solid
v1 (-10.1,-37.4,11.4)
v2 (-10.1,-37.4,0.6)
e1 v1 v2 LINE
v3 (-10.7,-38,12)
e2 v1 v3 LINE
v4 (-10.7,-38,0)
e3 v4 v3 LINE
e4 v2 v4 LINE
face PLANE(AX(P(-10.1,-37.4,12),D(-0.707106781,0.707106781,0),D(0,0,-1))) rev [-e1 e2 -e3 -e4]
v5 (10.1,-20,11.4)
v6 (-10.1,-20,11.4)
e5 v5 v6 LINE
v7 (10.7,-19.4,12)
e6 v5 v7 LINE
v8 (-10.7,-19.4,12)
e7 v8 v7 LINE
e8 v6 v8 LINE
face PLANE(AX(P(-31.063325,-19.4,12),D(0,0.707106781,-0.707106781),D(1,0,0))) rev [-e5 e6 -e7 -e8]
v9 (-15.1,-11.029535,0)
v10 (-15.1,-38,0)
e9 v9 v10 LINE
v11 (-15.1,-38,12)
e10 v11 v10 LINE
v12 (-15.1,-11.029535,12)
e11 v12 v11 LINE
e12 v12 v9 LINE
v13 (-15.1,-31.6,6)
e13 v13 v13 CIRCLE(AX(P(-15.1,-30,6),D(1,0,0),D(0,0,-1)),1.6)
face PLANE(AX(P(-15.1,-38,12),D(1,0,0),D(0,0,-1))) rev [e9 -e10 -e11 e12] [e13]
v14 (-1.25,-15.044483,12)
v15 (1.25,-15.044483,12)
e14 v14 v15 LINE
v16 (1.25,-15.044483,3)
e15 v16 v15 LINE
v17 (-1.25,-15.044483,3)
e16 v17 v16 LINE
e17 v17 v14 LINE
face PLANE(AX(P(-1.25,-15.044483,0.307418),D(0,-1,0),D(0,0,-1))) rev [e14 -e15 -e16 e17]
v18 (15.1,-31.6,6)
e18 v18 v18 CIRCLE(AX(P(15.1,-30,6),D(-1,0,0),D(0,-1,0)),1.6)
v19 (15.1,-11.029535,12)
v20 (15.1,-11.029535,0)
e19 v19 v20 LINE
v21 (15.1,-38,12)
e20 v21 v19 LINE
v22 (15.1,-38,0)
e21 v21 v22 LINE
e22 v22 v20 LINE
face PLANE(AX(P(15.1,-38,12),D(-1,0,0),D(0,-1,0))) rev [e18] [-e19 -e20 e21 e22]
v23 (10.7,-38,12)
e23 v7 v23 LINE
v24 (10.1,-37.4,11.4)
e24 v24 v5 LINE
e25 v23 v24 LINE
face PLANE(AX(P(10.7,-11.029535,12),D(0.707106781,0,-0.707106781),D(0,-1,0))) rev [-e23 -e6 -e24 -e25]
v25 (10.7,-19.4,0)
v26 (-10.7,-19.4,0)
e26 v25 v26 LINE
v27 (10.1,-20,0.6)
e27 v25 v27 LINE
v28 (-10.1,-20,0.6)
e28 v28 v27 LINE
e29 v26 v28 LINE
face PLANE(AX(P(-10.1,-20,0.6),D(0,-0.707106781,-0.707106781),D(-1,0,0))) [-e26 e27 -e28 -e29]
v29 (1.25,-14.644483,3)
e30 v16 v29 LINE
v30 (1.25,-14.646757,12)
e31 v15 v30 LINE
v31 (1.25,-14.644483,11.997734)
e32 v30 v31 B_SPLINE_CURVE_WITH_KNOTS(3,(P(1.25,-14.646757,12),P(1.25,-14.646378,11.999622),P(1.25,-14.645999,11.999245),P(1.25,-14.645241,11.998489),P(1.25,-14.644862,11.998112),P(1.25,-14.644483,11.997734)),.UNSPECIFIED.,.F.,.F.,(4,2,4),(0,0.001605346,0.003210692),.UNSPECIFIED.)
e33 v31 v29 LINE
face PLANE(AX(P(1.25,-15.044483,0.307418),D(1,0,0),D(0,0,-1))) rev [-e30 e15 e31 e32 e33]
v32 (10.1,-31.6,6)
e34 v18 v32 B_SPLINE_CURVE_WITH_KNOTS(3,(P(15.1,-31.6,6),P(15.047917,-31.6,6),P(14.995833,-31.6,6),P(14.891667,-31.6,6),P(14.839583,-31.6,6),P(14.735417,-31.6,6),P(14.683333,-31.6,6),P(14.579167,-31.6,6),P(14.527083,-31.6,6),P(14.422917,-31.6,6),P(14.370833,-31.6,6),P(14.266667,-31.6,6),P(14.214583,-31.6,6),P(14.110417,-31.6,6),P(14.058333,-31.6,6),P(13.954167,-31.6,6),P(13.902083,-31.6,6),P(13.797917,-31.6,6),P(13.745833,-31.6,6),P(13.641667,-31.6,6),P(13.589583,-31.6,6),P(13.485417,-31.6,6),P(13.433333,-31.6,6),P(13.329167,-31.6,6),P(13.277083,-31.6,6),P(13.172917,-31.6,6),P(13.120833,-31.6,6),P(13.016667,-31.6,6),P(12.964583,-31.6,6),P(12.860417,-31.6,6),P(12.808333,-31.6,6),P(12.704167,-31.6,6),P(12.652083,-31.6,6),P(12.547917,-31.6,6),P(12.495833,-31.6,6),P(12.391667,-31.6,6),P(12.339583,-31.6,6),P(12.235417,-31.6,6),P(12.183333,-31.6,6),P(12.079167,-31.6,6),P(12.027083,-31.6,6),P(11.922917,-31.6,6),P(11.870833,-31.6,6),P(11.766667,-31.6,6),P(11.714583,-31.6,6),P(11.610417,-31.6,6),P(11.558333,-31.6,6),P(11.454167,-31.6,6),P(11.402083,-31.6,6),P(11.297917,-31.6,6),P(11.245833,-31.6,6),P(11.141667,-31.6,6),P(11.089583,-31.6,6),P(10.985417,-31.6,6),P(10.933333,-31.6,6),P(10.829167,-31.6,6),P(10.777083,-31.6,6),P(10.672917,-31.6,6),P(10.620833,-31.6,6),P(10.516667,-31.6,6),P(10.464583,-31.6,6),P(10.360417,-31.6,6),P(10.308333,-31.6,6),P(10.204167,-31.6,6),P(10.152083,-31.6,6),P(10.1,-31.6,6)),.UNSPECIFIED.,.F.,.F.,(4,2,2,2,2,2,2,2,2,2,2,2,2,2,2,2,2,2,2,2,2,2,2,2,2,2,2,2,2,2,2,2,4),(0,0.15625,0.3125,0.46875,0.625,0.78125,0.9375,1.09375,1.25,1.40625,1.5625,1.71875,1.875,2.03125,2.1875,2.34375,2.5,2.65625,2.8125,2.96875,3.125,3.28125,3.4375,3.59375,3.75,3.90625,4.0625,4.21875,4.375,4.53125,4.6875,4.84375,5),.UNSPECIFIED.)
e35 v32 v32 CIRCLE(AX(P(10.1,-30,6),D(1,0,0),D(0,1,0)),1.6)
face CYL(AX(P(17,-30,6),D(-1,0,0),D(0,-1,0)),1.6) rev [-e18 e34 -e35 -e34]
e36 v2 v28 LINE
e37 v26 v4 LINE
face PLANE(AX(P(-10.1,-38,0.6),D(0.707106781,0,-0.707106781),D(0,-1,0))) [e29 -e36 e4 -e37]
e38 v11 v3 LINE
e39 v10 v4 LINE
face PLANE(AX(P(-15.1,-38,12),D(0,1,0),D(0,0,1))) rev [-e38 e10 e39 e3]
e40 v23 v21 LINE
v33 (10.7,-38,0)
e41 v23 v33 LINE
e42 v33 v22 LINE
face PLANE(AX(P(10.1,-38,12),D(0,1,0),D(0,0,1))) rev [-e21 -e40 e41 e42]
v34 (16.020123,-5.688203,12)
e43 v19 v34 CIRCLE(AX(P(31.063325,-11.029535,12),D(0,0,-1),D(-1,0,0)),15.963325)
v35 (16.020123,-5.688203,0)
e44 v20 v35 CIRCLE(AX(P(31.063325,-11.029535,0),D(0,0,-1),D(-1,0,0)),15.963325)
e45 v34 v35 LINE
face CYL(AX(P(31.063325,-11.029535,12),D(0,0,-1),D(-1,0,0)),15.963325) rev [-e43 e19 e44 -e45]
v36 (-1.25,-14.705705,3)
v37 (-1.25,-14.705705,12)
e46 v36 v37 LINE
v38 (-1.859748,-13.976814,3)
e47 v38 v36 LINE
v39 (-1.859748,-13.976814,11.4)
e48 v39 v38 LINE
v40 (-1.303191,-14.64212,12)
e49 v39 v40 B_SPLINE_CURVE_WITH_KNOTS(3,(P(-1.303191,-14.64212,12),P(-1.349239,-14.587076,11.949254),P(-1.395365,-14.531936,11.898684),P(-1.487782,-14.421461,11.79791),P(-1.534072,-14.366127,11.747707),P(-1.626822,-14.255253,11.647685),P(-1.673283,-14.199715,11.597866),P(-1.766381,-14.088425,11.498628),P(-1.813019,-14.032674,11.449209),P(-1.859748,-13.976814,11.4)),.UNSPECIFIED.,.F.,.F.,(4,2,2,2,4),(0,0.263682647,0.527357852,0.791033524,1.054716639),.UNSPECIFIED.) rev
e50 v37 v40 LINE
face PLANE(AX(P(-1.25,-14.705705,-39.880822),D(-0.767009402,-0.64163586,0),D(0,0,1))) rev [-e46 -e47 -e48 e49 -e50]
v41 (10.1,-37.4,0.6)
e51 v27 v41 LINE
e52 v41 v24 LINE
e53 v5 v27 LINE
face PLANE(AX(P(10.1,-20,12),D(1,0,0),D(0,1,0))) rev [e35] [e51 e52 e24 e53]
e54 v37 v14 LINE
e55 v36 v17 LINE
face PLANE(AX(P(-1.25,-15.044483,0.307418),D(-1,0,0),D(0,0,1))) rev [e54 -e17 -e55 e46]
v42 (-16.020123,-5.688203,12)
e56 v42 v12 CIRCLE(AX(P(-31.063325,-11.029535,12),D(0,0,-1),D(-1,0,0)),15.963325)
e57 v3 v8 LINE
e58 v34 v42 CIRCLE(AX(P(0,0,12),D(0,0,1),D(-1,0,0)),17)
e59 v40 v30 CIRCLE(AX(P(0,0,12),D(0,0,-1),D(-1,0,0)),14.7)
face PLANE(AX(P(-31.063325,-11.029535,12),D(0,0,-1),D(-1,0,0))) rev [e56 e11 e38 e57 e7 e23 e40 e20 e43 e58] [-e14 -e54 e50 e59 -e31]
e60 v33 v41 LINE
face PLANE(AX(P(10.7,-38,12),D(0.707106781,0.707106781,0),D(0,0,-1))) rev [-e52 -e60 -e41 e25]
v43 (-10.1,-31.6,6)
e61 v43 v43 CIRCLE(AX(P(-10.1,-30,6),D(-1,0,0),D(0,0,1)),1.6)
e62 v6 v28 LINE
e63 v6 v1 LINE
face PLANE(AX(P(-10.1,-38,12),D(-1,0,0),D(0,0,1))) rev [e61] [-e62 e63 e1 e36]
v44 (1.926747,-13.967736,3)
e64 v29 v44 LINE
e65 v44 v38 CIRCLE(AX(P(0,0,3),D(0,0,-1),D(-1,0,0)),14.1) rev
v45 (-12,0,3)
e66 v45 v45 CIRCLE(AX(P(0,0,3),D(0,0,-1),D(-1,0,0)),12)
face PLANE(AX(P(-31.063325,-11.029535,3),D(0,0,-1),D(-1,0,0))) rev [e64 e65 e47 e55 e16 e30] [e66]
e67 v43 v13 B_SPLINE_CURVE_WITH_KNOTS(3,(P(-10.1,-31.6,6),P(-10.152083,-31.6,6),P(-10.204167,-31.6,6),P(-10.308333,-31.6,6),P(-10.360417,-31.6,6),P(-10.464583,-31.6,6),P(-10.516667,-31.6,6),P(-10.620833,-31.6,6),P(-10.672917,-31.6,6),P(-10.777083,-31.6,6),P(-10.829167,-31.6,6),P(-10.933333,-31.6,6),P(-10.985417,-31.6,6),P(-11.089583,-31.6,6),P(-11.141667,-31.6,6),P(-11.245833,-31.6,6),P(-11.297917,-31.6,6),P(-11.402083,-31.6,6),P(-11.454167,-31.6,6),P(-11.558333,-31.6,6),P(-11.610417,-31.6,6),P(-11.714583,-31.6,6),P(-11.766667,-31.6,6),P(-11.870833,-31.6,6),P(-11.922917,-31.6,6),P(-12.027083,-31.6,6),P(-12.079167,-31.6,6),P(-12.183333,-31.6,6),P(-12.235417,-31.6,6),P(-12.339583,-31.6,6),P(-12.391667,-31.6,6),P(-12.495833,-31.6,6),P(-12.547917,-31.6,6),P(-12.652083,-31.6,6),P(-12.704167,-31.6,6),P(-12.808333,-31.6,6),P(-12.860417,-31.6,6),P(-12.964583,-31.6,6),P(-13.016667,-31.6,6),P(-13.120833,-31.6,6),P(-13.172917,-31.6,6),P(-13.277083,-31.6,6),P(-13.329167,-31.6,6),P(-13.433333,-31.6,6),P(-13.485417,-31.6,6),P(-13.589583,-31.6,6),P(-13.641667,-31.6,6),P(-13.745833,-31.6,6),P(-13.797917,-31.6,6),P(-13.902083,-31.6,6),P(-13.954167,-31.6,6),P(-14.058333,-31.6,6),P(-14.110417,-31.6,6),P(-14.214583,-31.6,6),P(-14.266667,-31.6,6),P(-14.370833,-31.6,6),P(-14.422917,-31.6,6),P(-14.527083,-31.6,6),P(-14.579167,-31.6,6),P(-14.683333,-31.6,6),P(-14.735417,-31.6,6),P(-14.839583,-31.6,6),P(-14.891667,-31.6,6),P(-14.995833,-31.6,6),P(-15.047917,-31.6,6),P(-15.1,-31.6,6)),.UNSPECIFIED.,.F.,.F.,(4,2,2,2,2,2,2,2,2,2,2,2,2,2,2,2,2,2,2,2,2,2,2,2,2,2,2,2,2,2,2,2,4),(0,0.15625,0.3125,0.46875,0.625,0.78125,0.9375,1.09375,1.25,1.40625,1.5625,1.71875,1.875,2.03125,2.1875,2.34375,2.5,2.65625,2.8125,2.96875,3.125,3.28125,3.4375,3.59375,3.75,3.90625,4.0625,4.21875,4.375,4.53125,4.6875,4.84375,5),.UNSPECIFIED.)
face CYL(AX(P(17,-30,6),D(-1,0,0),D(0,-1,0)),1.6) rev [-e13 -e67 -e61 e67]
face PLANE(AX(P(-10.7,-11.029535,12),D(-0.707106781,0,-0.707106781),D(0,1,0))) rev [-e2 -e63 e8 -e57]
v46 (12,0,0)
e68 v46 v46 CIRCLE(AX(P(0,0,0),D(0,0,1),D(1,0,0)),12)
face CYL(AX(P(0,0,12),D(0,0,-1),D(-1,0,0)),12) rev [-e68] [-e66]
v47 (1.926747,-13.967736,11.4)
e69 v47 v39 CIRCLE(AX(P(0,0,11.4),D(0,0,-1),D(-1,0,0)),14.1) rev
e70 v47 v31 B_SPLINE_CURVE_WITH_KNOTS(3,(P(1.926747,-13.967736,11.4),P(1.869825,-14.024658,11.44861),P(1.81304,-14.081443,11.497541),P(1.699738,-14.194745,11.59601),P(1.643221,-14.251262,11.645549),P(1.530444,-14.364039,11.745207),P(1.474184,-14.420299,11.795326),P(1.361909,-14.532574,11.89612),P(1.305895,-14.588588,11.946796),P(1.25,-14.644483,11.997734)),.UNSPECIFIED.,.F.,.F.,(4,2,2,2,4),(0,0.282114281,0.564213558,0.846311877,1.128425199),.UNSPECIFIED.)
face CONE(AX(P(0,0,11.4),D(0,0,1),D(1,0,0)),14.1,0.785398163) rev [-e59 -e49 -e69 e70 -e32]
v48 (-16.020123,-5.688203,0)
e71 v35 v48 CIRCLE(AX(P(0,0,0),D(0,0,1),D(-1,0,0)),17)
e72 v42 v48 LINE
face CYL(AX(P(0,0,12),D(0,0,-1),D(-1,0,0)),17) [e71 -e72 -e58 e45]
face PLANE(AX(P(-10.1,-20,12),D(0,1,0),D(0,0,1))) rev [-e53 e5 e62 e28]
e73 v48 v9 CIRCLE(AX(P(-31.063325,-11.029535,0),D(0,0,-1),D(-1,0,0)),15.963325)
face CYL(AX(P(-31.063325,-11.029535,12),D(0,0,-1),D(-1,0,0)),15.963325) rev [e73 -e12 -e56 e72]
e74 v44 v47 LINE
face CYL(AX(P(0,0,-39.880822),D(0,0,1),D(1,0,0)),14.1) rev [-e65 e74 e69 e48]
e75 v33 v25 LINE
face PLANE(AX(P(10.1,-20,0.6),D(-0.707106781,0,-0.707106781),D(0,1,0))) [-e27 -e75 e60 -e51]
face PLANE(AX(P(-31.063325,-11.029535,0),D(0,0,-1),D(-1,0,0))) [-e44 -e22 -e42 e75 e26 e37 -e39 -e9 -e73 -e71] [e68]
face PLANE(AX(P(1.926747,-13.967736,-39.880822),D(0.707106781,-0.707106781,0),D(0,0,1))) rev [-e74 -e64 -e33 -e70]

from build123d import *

# Parameters (mm, degrees)
SKETCH1_R               = 12
BOSS_EXTRUDE1_DEPTH     = 12
SKETCH9_R               = 14.1
CUT_EXTRUDE2_DEPTH      = 9
SKETCH7_R               = 14
SKETCH7_R_2             = 12
BOSS_EXTRUDE3_DEPTH     = 3
CUT_EXTRUDE5_DEPTH      = 49.191389272
CUT_EXTRUDE5_DEPTH_BACK = 49.191389272
SKETCH12_R              = 1.6
SKETCH13_W              = 2.5
SKETCH13_H              = 1
CUT_EXTRUDE6_DEPTH      = 9
CHAMFER1_SIZE           = 0.6
CHAMFER1_SIZE_2         = 0.661222502


with BuildPart() as part:
    # Sketch1 → Boss-Extrude1 (new body)
    with BuildSketch(Plane.XY):
        with BuildLine():
            Line((-15.1, -38), (-10.1, -38))
            Line((-10.1, -38), (-10.1, -20))
            Line((-10.1, -20), (10.1, -20))
            Line((10.1, -20), (10.1, -38))
            Line((10.1, -38), (15.1, -38))
            Line((15.1, -38), (15.1, -11.029534738))
            ThreePointArc((15.1, -11.029534738), (15.331712472, -8.319532432), (16.020123134, -5.688203124))
            ThreePointArc((16.020123134, -5.688203124), (0, 17), (-16.020123134, -5.688203124))
            ThreePointArc((-16.020123134, -5.688203124), (-15.331712472, -8.319532432), (-15.1, -11.029534738))
            Line((-15.1, -11.029534738), (-15.1, -38))
        make_face()
        Circle(SKETCH1_R, mode=Mode.SUBTRACT)
    extrude(amount=BOSS_EXTRUDE1_DEPTH)

    # Sketch9 → Cut-Extrude2 (cut)
    with BuildSketch(Plane.XY.offset(12)):
        Circle(SKETCH9_R)
    extrude(amount=-CUT_EXTRUDE2_DEPTH, mode=Mode.SUBTRACT)

    # Sketch7 → Boss-Extrude3 (add)
    with BuildSketch(Plane.XY):
        Circle(SKETCH7_R)
        with Locations(Location((0, 0, 0), (0, 0, 180))):
            Circle(SKETCH7_R_2, mode=Mode.SUBTRACT)
    extrude(amount=BOSS_EXTRUDE3_DEPTH)

    # Sketch12 → Cut-Extrude5 (cut, two sides: drawn at the far end of the back side and taken through both)
    with BuildSketch(Plane.ZY.offset(-10.1).offset(-CUT_EXTRUDE5_DEPTH_BACK)):
        with Locations(Location((6, -30, 0), (0, 0, 270))):
            Circle(SKETCH12_R)
    extrude(amount=CUT_EXTRUDE5_DEPTH + CUT_EXTRUDE5_DEPTH_BACK, mode=Mode.SUBTRACT)

    # Sketch13 → Cut-Extrude6 (cut)
    with BuildSketch(Plane.XY.offset(12)):
        with Locations((0, -14.544482903)):
            Rectangle(SKETCH13_W, SKETCH13_H)
    extrude(amount=-CUT_EXTRUDE6_DEPTH, mode=Mode.SUBTRACT)

    # Chamfer1
    # the kernel refuses this chamfer: 0.661222502, 0.6 mm, written as the material it takes off along each edge
    with BuildSketch(Plane(origin=(10.1, -20, 0), x_dir=(0, 0, 1), z_dir=(0, -1, 0)), Plane(origin=(-10.1, -39.543009793, 0), x_dir=(0, 0, 1), z_dir=(0, 1, 0))) as chamfer1_piece_1:
        Polygon((CHAMFER1_SIZE, 0), (0, -CHAMFER1_SIZE), (0, 0), align=None)
    extrude(amount=19.543009793, mode=Mode.SUBTRACT)
    with BuildSketch(Plane(origin=(-10.1, -20, 0), x_dir=(0, 0, 1), z_dir=(1, 0, 0))) as chamfer1_piece_2:
        Polygon((CHAMFER1_SIZE, 0), (0, -CHAMFER1_SIZE), (0, 0), align=None)
    extrude(amount=20.2, mode=Mode.SUBTRACT)
    with BuildSketch(Plane(origin=(-10.1, -39.543009793, 12), x_dir=(0, 0, -1), z_dir=(0, 1, 0)), Plane(origin=(10.1, -20, 12), x_dir=(0, 0, -1), z_dir=(0, -1, 0))) as chamfer1_piece_3:
        Polygon((CHAMFER1_SIZE, 0), (0, CHAMFER1_SIZE), (0, 0), align=None)
    extrude(amount=19.543009793, mode=Mode.SUBTRACT)
    with BuildSketch(Plane(origin=(10.1, -38, -1.543009793), x_dir=(0, 1, 0), z_dir=(0, 0, 1))) as chamfer1_piece_4:
        Polygon((CHAMFER1_SIZE, 0), (0, -CHAMFER1_SIZE), (0, 0), align=None)
    extrude(amount=15.086019586, mode=Mode.SUBTRACT)
    with BuildSketch(Plane(origin=(-10.1, -38, -1.543009793), x_dir=(0, 1, 0), z_dir=(0, 0, 1))) as chamfer1_piece_5:
        Polygon((CHAMFER1_SIZE, 0), (0, CHAMFER1_SIZE), (0, 0), align=None)
    extrude(amount=15.086019586, mode=Mode.SUBTRACT)
    with BuildSketch(Plane(origin=(-10.1, -20, 12), x_dir=(0, 0, -1), z_dir=(1, 0, 0))) as chamfer1_piece_6:
        Polygon((CHAMFER1_SIZE, 0), (0, CHAMFER1_SIZE), (0, 0), align=None)
    extrude(amount=20.2, mode=Mode.SUBTRACT)
    with BuildSketch(Plane(origin=(-1.25, -14.044482903, 13.704300801), x_dir=(0, -1, 0), z_dir=(0, 0, -1))) as chamfer1_piece_7:
        with BuildLine():
            Line((CHAMFER1_SIZE_2, 0), (-0.06766867, 0.609748345))
            ThreePointArc((-0.06766867, 0.609748345), (-0.031575454, 0.314744335), (0, 0))
            Line((0, 0), (CHAMFER1_SIZE_2, 0))
        make_face()
    extrude(amount=10.704300801, mode=Mode.SUBTRACT)
    with BuildSketch(Plane(origin=(1.25, -14.044482903, 13.754921918), x_dir=(0, -1, 0), z_dir=(0, 0, -1))) as chamfer1_piece_8:
        with BuildLine():
            Line((CHAMFER1_SIZE, 0), (-0.07674701, -0.67674701))
            ThreePointArc((-0.07674701, -0.67674701), (-0.035457258, -0.349124916), (0, 0))
            Line((0, 0), (CHAMFER1_SIZE, 0))
        make_face()
    extrude(amount=10.754921918, mode=Mode.SUBTRACT)
    with BuildSketch(Plane(origin=(-10.1, -20, 0), x_dir=(0, 0, 1), z_dir=(1, 0, 0))) as chamfer1_piece_9a_section:
        Polygon((CHAMFER1_SIZE, 0), (0, -CHAMFER1_SIZE), (0, 0), align=None)
    chamfer1_piece_9a = extrude(amount=21.743009793, mode=Mode.PRIVATE)
    chamfer1_piece_9a = split(chamfer1_piece_9a, bisect_by=Plane(origin=(10.1, -20, 0), z_dir=(1, 0, 0)), keep=Keep.TOP, mode=Mode.PRIVATE)
    with BuildSketch(Plane(origin=(10.1, -18.456990207, 0), x_dir=(0, 0, 1), z_dir=(0, -1, 0))) as chamfer1_piece_9b_section:
        Polygon((CHAMFER1_SIZE, 0), (0, -CHAMFER1_SIZE), (0, 0), align=None)
    chamfer1_piece_9b = extrude(amount=19.543009793, mode=Mode.PRIVATE)
    chamfer1_piece_9b = split(chamfer1_piece_9b, bisect_by=Plane(origin=(10.1, -20, 0), z_dir=(0, 1, 0)), keep=Keep.TOP, mode=Mode.PRIVATE)
    chamfer1_piece_9 = chamfer1_piece_9a & chamfer1_piece_9b
    add(chamfer1_piece_9, mode=Mode.SUBTRACT)
    with BuildSketch(Plane(origin=(-10.1, -38, 0), x_dir=(0, 0, 1), z_dir=(0, 1, 0))) as chamfer1_piece_10a_section:
        Polygon((CHAMFER1_SIZE, 0), (0, -CHAMFER1_SIZE), (0, 0), align=None)
    chamfer1_piece_10a = extrude(amount=19.543009793, mode=Mode.PRIVATE)
    chamfer1_piece_10a = split(chamfer1_piece_10a, bisect_by=Plane(origin=(-10.1, -20, 0), z_dir=(0, 1, 0)), keep=Keep.TOP, mode=Mode.PRIVATE)
    with BuildSketch(Plane(origin=(-11.643009793, -20, 0), x_dir=(0, 0, 1), z_dir=(1, 0, 0))) as chamfer1_piece_10b_section:
        Polygon((CHAMFER1_SIZE, 0), (0, -CHAMFER1_SIZE), (0, 0), align=None)
    chamfer1_piece_10b = extrude(amount=21.743009793, mode=Mode.PRIVATE)
    chamfer1_piece_10b = split(chamfer1_piece_10b, bisect_by=Plane(origin=(-10.1, -20, 0), z_dir=(-1, 0, 0)), keep=Keep.TOP, mode=Mode.PRIVATE)
    chamfer1_piece_10 = chamfer1_piece_10a & chamfer1_piece_10b
    add(chamfer1_piece_10, mode=Mode.SUBTRACT)
    with BuildSketch(Plane(origin=(-10.1, -38, 12), x_dir=(0, 0, -1), z_dir=(0, 1, 0))) as chamfer1_piece_11a_section:
        Polygon((CHAMFER1_SIZE, 0), (0, CHAMFER1_SIZE), (0, 0), align=None)
    chamfer1_piece_11a = extrude(amount=19.543009793, mode=Mode.PRIVATE)
    chamfer1_piece_11a = split(chamfer1_piece_11a, bisect_by=Plane(origin=(-10.1, -20, 12), z_dir=(0, 1, 0)), keep=Keep.TOP, mode=Mode.PRIVATE)
    with BuildSketch(Plane(origin=(-11.643009793, -20, 12), x_dir=(0, 0, -1), z_dir=(1, 0, 0))) as chamfer1_piece_11b_section:
        Polygon((CHAMFER1_SIZE, 0), (0, CHAMFER1_SIZE), (0, 0), align=None)
    chamfer1_piece_11b = extrude(amount=21.743009793, mode=Mode.PRIVATE)
    chamfer1_piece_11b = split(chamfer1_piece_11b, bisect_by=Plane(origin=(-10.1, -20, 12), z_dir=(-1, 0, 0)), keep=Keep.TOP, mode=Mode.PRIVATE)
    chamfer1_piece_11 = chamfer1_piece_11a & chamfer1_piece_11b
    add(chamfer1_piece_11, mode=Mode.SUBTRACT)
    with BuildSketch(Plane(origin=(-10.1, -20, 12), x_dir=(0, 0, -1), z_dir=(1, 0, 0))) as chamfer1_piece_12a_section:
        Polygon((CHAMFER1_SIZE, 0), (0, CHAMFER1_SIZE), (0, 0), align=None)
    chamfer1_piece_12a = extrude(amount=21.743009793, mode=Mode.PRIVATE)
    chamfer1_piece_12a = split(chamfer1_piece_12a, bisect_by=Plane(origin=(10.1, -20, 12), z_dir=(1, 0, 0)), keep=Keep.TOP, mode=Mode.PRIVATE)
    with BuildSketch(Plane(origin=(10.1, -18.456990207, 12), x_dir=(0, 0, -1), z_dir=(0, -1, 0))) as chamfer1_piece_12b_section:
        Polygon((CHAMFER1_SIZE, 0), (0, CHAMFER1_SIZE), (0, 0), align=None)
    chamfer1_piece_12b = extrude(amount=19.543009793, mode=Mode.PRIVATE)
    chamfer1_piece_12b = split(chamfer1_piece_12b, bisect_by=Plane(origin=(10.1, -20, 12), z_dir=(0, 1, 0)), keep=Keep.TOP, mode=Mode.PRIVATE)
    chamfer1_piece_12 = chamfer1_piece_12a & chamfer1_piece_12b
    add(chamfer1_piece_12, mode=Mode.SUBTRACT)
    # the kernel refuses this chamfer: 0.661222502, 0.6 mm, written as the material it takes off along each edge
    with BuildSketch(Plane(origin=(0, 0, 12), x_dir=(-0.02220052669057942, -0.9997535379355558, 0), z_dir=(0.9997535379355558, -0.02220052669057942, 0))) as chamfer1_2_piece_1:
        Polygon((14.1 + CHAMFER1_SIZE, 0), (14.1, CHAMFER1_SIZE), (14.1, 0), align=None)
    revolve(axis=Axis((0, 0, 12), (0, 0, -1)), revolution_arc=357.181058693, mode=Mode.SUBTRACT)


solid = part.part
